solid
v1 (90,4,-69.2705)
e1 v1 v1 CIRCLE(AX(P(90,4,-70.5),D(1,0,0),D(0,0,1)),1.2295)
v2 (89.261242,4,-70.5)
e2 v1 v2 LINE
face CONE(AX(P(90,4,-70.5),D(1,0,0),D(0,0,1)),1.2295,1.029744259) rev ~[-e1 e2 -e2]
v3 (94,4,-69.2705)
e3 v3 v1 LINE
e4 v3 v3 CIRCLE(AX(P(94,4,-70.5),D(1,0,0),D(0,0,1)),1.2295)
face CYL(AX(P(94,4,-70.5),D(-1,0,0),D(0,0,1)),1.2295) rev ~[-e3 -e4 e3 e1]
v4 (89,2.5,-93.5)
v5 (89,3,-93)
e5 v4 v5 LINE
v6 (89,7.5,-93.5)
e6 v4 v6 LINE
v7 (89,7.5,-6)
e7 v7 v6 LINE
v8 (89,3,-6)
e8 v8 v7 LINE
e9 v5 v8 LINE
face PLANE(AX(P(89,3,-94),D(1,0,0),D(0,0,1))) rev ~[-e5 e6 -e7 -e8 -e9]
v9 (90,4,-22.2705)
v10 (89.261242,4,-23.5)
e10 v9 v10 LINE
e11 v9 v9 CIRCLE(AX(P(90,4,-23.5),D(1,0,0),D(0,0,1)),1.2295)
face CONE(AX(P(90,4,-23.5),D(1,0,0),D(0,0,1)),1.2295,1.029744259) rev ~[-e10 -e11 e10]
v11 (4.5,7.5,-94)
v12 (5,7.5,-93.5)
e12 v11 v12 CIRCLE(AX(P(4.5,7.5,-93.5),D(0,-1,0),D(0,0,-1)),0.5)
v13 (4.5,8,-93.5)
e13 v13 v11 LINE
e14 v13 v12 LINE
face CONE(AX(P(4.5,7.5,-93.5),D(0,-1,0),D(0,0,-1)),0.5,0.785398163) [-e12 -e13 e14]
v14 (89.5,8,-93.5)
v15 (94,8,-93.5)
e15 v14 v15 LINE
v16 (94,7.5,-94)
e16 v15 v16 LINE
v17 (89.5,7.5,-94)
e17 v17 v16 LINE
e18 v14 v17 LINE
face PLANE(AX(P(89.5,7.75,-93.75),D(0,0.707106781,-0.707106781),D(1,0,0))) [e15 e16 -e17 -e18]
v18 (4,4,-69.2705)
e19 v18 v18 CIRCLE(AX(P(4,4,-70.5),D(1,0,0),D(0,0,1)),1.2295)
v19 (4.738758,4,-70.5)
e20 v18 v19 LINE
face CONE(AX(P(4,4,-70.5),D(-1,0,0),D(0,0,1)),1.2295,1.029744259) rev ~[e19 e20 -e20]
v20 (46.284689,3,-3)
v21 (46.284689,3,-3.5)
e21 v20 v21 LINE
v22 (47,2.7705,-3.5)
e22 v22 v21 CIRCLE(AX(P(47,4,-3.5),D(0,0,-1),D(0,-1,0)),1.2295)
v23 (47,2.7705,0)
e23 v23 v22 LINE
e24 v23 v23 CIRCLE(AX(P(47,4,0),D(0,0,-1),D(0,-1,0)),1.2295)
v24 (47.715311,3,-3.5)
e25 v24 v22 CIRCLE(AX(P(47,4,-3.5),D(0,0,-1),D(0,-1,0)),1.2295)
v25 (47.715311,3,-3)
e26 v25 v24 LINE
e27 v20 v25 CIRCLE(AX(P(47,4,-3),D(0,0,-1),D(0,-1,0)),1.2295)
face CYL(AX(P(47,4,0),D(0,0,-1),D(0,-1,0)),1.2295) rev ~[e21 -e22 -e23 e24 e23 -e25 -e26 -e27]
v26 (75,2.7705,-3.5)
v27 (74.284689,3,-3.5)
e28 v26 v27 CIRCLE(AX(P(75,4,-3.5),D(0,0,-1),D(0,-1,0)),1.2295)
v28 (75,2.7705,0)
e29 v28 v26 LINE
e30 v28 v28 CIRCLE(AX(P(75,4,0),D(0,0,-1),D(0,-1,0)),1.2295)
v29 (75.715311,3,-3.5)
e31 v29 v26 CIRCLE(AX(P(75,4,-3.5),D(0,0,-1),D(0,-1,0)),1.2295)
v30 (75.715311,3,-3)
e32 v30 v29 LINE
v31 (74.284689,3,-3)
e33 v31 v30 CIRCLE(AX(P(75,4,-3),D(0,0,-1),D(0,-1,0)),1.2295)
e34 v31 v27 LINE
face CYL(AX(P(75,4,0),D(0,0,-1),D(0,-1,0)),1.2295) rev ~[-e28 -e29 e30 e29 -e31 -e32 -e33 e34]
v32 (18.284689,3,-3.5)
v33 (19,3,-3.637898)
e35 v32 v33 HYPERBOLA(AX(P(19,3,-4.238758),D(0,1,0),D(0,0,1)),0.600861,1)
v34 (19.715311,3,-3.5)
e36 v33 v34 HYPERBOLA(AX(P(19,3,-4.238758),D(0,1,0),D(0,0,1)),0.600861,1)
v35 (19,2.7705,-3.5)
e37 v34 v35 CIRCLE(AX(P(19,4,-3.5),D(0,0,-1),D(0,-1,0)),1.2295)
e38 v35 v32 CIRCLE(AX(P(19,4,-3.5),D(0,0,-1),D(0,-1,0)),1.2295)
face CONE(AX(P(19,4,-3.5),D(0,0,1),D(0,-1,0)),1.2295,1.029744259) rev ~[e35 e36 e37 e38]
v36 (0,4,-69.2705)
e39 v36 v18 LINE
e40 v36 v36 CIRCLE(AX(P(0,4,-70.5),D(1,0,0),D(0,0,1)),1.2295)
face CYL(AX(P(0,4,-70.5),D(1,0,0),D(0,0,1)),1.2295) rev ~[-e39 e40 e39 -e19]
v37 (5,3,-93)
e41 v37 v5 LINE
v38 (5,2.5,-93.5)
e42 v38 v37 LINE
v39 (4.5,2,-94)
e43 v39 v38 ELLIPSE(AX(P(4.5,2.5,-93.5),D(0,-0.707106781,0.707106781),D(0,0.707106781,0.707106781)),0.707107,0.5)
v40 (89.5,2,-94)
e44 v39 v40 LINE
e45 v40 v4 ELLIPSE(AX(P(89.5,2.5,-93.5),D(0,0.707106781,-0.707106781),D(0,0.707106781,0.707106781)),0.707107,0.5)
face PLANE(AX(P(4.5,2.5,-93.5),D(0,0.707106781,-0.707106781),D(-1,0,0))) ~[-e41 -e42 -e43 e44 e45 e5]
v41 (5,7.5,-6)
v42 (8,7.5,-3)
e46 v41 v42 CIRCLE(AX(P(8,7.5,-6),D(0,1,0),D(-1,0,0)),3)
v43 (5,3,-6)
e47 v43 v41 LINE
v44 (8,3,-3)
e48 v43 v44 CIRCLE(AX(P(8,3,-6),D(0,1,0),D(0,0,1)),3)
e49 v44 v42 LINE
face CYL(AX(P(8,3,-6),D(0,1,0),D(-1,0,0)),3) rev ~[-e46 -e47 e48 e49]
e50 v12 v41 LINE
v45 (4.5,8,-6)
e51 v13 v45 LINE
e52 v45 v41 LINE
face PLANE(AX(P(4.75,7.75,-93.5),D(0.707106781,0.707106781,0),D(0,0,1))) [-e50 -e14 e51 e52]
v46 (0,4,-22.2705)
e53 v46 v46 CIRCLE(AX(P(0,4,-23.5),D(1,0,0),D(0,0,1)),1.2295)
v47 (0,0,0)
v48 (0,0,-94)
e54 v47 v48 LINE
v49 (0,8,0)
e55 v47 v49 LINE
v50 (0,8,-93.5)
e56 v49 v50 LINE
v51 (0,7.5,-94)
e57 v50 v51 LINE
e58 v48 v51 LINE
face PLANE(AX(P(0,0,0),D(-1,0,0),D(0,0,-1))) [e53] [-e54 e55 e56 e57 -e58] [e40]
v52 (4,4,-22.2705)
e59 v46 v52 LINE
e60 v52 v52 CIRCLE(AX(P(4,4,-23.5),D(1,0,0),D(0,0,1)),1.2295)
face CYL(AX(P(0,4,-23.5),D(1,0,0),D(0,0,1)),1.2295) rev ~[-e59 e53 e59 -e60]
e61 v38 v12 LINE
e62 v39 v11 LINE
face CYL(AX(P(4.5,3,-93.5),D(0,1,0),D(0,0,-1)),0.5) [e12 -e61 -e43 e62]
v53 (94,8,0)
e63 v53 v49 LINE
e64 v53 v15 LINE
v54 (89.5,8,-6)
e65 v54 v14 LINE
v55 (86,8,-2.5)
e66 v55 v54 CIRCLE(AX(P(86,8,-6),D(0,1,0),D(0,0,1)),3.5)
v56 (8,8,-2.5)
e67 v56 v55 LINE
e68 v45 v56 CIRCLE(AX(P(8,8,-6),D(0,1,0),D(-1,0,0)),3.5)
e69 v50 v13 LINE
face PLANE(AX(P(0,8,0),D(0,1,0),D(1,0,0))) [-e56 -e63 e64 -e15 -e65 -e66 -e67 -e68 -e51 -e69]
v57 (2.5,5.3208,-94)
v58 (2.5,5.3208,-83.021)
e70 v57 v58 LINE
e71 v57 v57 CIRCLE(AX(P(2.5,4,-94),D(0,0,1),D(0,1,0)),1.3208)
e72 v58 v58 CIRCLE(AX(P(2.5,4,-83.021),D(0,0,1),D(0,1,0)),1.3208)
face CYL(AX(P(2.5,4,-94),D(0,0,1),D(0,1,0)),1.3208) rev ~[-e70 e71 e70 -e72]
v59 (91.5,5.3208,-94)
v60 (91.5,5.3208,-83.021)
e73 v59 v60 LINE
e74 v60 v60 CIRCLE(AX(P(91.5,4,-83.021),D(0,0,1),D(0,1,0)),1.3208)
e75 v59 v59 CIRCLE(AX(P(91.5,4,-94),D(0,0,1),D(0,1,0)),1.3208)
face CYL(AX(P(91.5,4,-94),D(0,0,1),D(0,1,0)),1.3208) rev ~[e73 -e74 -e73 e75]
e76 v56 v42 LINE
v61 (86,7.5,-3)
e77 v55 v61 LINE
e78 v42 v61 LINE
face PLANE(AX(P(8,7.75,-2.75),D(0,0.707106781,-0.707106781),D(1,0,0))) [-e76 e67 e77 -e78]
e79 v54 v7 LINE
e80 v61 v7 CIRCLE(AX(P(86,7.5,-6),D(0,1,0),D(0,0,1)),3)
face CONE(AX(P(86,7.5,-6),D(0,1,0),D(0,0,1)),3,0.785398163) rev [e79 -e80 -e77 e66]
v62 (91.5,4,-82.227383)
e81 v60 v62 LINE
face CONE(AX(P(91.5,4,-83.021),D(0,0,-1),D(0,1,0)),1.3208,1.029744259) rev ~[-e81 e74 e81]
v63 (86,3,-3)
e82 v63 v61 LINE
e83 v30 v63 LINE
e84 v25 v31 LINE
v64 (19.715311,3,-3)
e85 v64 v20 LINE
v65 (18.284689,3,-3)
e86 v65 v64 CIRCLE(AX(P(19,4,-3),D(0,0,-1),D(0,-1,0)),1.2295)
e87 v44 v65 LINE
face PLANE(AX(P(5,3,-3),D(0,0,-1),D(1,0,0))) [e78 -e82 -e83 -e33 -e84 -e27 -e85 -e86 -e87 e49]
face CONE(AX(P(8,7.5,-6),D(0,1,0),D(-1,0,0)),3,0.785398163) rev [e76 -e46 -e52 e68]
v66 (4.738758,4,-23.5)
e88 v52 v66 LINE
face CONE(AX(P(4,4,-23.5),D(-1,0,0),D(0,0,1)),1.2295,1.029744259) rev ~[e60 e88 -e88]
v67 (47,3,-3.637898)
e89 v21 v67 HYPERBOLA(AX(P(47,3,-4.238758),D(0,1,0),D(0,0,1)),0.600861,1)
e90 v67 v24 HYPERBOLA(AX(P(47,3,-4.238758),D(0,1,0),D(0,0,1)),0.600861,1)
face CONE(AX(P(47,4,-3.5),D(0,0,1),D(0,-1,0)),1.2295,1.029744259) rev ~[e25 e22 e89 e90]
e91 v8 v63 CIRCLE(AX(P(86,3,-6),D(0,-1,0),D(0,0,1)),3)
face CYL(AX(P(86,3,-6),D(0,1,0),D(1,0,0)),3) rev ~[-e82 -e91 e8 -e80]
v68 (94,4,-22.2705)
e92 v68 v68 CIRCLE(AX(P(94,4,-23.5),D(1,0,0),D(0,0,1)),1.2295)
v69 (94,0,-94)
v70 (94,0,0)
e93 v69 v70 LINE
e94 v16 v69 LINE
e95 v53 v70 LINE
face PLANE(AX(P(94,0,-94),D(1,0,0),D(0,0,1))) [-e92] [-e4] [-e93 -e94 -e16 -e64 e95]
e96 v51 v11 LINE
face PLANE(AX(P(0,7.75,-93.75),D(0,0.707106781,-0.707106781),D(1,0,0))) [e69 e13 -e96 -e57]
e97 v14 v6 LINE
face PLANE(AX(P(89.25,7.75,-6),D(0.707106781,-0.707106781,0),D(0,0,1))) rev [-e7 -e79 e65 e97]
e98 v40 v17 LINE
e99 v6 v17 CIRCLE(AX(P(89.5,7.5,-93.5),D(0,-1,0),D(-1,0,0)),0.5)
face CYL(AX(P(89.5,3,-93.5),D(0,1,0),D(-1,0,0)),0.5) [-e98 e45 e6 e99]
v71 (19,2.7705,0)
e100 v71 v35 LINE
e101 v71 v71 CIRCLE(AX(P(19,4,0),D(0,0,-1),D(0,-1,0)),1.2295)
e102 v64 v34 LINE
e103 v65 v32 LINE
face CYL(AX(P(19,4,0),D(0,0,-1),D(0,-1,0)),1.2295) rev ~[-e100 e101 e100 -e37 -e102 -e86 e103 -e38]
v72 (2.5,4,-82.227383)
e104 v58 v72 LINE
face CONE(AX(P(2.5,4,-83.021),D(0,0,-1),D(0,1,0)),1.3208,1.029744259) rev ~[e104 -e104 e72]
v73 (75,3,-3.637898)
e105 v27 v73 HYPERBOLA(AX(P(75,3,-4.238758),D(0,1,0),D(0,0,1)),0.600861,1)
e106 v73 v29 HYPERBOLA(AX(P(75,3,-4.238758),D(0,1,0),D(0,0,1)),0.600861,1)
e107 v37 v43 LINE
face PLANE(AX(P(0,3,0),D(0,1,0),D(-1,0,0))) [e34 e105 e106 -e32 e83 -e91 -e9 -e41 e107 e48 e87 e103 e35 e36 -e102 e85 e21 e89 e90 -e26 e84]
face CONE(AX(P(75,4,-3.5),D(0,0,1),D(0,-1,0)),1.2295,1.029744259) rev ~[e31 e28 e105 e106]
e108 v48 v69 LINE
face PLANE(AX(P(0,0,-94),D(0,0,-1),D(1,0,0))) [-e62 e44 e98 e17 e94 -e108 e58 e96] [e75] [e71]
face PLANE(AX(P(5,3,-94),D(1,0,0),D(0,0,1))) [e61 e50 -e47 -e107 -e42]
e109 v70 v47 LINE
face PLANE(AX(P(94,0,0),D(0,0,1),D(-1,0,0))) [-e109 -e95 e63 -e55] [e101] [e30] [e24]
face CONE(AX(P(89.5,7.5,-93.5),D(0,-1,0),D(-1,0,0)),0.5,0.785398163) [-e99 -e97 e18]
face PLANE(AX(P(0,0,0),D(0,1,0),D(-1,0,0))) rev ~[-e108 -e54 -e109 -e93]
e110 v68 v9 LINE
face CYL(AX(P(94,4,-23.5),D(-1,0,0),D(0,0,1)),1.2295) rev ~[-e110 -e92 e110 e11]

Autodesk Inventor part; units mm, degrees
ref_plane "YZ Plane" through (0, 0, 0) normal (1, 0, 0) x (0, 1, 0)
ref_plane "XZ Plane" through (0, 0, 0) normal (0, 1, 0) x (-1, 0, 0)
sketch "Sketch3" plane through (0, 0, 0) normal (0, 1, 0) x (-1, 0, 0)
  line L0 (3, 3) -> (-97, 3) construction
  line L1 (-97, 3) -> (-97, 0) construction
  line L2 (-97, 0) -> (3, 0) construction
  line L3 (3, 0) -> (3, 3) construction
  line L4 (-97, 0) -> (-94, 0) construction
  line L5 (-94, 0) -> (-94, -94) construction
  line L6 (-94, -94) -> (-97, -94) construction
  line L7 (-97, -94) -> (-97, 0) construction
  line L8 (-97, -94) -> (3, -94) construction
  line L9 (3, -94) -> (3, -97) construction
  line L10 (3, -97) -> (-97, -97) construction
  line L11 (-97, -97) -> (-97, -94) construction
  line L12 (3, -94) -> (0, -94) construction
  line L13 (0, -94) -> (0, 0) construction
  line L14 (0, 0) -> (3, 0) construction
  line L15 (3, 0) -> (3, -94) construction
  line L16 (0, -94) -> (-94, -94)
  line L17 (-94, -94) -> (-94, 0)
  line L18 (-94, 0) -> (0, 0)
  line L19 (0, 0) -> (0, -94)
  line L20 (3, 3) -> (3, 0) construction
  dimension "d6" = 3
  dimension "d7" = 100
  dimension "d8" = 100
  dimension "d9" = 3
extrude "Extrusion2" add sketch "Sketch3" along normal blind 3
sketch "Sketch4" plane through (0, 3, 0) normal (0, 1, 0) x (1, 0, 0)
  line L0 (94, 94) -> (0, 94) projected
  line L1 (0, 0) -> (94, 0) projected
  line L2 (0, 94) -> (5, 94)
  line L3 (5, 94) -> (5, 0)
  line L4 (5, 0) -> (0, 0)
  line L5 (0, 0) -> (0, 94)
  line L6 (94, 0) -> (94, 94) projected
  line L7 (94, 94) -> (89, 94)
  line L8 (89, 94) -> (89, 0)
  line L9 (89, 0) -> (94, 0)
  line L10 (94, 0) -> (94, 94)
  line L11 (5, 3) -> (89, 3)
  line L12 (89, 3) -> (89, 0)
  line L13 (89, 0) -> (5, 0)
  line L14 (5, 0) -> (5, 3)
  dimension "d12" = 5
  dimension "d13" = 3
extrude "Extrusion3" add sketch "Sketch4" along normal blind 5 contours L6 L1 L8 L0 | L3 L1 L5 L0 | L8 L1 L3 L11
sketch "Sketch6" plane through (94, 0, -94) normal (0, 0, -1) x (-1, 0, 0)
  line L0 (0, 0) -> (94, 0) projected
  line L1 (89, 8) -> (94, 8) projected
  line L2 (89, 3) -> (89, 8) projected
  line L3 (94, 0) -> (94, 8) projected
  line L4 (0, 0) -> (0, 8) projected
  point P0 (91.5, 4)
  point P1 (2.5, 4)
  dimension "d28" = 8
  dimension "d29" = 5
  dimension "d30" = 2.5
  dimension "d31" = 4
  dimension "d32" = 2.5
hole "Hole1" at (2.5, 4, -94) at (91.5, 4, -94) direction (0, 0, 1) diameter 2.6416 depth 10.979 tip angle 118 thread size "6-32 UNC" class "2B" standard "ANSI Unified Screw Threads"
fillet "Fillet1" radius 3 2 edges at (89, 5.5, -3) (5, 5.5, -3)
fillet "Fillet2" radius 0.5 2 edges at (5, 5.5, -94) (89, 5.5, -94)
sketch "Sketch7" plane through (0, 0, 0) normal (0, 0, 1) x (1, 0, 0)
  line L0 (0, 0) -> (94, 0) projected
  line L1 (0, 0) -> (0, 8) projected
  line L2 (89, 8) -> (5, 8) projected
  point P0 (19, 4)
  point P1 (47, 4)
  point P2 (75, 4)
  dimension "d40" = 4
  dimension "d57" = 84
  dimension "d58" = 14
  dimension "d59" = 28
  dimension "d60" = 28
hole "Hole2" at (19, 4, 0) at (47, 4, 0) at (75, 4, 0) direction (0, 0, -1) diameter 2.459 depth 3.5 tip angle 118 thread size "M3x0.5" class "6H" standard "ANSI Metric M Profile"
sketch "Sketch9" plane through (0, 0, -94) normal (-1, 0, 0) x (0, 0, 1)
  line L0 (0, 8) -> (94, 8) projected
  line L1 (0, 0) -> (94, 0) projected
  line L2 (0, 0) -> (0, 8) projected
  point P0 (23.5, 4)
  point P1 (70.5, 4)
  dimension "d51" = 4
  dimension "d52" = 8
  dimension "d53" = 94
  dimension "d54" = 23.5
  dimension "d55" = 47
hole "Hole3" at (0, 4, -70.5) at (0, 4, -23.5) direction (1, 0, 0) diameter 2.459 depth 4 tip angle 118 thread size "M3x0.5" class "6H" standard "ANSI Metric M Profile"
ref_plane "Work Plane1" through (47, 0, -94) normal (-1, 0, 0) x (0, 0, 1)
mirror "Mirror1" about plane through (47, 0, -94) normal (-1, 0, 0) of "Hole3"
chamfer "Chamfer2" distance 1 angle 45 1 edges at (47, 3, -94)
chamfer "Chamfer3" distance 0.5 angle 45 3 edges at (5, 8, -49.75) (47, 8, -3) (89, 8, -49.75)
ref_plane "Work Plane2" through (47, 0, -94) normal (-1, 0, 0) x (0, 0, 1)
equation "\"d30\" = 0.5 * d29"
equation "\"d31\" = 0.5 * d28"
equation "\"d32\" = d30"
equation "\"d58\" = 0.166667 * d57"
equation "\"d59\" = 2 * d58"
equation "\"d60\" = d59"
equation "\"d51\" = 0.5 * d52"
equation "\"d54\" = 0.25 * d53"
equation "\"d55\" = 2 * d54"
properties part number "LeftPanel" material "Aluminum 6061"
